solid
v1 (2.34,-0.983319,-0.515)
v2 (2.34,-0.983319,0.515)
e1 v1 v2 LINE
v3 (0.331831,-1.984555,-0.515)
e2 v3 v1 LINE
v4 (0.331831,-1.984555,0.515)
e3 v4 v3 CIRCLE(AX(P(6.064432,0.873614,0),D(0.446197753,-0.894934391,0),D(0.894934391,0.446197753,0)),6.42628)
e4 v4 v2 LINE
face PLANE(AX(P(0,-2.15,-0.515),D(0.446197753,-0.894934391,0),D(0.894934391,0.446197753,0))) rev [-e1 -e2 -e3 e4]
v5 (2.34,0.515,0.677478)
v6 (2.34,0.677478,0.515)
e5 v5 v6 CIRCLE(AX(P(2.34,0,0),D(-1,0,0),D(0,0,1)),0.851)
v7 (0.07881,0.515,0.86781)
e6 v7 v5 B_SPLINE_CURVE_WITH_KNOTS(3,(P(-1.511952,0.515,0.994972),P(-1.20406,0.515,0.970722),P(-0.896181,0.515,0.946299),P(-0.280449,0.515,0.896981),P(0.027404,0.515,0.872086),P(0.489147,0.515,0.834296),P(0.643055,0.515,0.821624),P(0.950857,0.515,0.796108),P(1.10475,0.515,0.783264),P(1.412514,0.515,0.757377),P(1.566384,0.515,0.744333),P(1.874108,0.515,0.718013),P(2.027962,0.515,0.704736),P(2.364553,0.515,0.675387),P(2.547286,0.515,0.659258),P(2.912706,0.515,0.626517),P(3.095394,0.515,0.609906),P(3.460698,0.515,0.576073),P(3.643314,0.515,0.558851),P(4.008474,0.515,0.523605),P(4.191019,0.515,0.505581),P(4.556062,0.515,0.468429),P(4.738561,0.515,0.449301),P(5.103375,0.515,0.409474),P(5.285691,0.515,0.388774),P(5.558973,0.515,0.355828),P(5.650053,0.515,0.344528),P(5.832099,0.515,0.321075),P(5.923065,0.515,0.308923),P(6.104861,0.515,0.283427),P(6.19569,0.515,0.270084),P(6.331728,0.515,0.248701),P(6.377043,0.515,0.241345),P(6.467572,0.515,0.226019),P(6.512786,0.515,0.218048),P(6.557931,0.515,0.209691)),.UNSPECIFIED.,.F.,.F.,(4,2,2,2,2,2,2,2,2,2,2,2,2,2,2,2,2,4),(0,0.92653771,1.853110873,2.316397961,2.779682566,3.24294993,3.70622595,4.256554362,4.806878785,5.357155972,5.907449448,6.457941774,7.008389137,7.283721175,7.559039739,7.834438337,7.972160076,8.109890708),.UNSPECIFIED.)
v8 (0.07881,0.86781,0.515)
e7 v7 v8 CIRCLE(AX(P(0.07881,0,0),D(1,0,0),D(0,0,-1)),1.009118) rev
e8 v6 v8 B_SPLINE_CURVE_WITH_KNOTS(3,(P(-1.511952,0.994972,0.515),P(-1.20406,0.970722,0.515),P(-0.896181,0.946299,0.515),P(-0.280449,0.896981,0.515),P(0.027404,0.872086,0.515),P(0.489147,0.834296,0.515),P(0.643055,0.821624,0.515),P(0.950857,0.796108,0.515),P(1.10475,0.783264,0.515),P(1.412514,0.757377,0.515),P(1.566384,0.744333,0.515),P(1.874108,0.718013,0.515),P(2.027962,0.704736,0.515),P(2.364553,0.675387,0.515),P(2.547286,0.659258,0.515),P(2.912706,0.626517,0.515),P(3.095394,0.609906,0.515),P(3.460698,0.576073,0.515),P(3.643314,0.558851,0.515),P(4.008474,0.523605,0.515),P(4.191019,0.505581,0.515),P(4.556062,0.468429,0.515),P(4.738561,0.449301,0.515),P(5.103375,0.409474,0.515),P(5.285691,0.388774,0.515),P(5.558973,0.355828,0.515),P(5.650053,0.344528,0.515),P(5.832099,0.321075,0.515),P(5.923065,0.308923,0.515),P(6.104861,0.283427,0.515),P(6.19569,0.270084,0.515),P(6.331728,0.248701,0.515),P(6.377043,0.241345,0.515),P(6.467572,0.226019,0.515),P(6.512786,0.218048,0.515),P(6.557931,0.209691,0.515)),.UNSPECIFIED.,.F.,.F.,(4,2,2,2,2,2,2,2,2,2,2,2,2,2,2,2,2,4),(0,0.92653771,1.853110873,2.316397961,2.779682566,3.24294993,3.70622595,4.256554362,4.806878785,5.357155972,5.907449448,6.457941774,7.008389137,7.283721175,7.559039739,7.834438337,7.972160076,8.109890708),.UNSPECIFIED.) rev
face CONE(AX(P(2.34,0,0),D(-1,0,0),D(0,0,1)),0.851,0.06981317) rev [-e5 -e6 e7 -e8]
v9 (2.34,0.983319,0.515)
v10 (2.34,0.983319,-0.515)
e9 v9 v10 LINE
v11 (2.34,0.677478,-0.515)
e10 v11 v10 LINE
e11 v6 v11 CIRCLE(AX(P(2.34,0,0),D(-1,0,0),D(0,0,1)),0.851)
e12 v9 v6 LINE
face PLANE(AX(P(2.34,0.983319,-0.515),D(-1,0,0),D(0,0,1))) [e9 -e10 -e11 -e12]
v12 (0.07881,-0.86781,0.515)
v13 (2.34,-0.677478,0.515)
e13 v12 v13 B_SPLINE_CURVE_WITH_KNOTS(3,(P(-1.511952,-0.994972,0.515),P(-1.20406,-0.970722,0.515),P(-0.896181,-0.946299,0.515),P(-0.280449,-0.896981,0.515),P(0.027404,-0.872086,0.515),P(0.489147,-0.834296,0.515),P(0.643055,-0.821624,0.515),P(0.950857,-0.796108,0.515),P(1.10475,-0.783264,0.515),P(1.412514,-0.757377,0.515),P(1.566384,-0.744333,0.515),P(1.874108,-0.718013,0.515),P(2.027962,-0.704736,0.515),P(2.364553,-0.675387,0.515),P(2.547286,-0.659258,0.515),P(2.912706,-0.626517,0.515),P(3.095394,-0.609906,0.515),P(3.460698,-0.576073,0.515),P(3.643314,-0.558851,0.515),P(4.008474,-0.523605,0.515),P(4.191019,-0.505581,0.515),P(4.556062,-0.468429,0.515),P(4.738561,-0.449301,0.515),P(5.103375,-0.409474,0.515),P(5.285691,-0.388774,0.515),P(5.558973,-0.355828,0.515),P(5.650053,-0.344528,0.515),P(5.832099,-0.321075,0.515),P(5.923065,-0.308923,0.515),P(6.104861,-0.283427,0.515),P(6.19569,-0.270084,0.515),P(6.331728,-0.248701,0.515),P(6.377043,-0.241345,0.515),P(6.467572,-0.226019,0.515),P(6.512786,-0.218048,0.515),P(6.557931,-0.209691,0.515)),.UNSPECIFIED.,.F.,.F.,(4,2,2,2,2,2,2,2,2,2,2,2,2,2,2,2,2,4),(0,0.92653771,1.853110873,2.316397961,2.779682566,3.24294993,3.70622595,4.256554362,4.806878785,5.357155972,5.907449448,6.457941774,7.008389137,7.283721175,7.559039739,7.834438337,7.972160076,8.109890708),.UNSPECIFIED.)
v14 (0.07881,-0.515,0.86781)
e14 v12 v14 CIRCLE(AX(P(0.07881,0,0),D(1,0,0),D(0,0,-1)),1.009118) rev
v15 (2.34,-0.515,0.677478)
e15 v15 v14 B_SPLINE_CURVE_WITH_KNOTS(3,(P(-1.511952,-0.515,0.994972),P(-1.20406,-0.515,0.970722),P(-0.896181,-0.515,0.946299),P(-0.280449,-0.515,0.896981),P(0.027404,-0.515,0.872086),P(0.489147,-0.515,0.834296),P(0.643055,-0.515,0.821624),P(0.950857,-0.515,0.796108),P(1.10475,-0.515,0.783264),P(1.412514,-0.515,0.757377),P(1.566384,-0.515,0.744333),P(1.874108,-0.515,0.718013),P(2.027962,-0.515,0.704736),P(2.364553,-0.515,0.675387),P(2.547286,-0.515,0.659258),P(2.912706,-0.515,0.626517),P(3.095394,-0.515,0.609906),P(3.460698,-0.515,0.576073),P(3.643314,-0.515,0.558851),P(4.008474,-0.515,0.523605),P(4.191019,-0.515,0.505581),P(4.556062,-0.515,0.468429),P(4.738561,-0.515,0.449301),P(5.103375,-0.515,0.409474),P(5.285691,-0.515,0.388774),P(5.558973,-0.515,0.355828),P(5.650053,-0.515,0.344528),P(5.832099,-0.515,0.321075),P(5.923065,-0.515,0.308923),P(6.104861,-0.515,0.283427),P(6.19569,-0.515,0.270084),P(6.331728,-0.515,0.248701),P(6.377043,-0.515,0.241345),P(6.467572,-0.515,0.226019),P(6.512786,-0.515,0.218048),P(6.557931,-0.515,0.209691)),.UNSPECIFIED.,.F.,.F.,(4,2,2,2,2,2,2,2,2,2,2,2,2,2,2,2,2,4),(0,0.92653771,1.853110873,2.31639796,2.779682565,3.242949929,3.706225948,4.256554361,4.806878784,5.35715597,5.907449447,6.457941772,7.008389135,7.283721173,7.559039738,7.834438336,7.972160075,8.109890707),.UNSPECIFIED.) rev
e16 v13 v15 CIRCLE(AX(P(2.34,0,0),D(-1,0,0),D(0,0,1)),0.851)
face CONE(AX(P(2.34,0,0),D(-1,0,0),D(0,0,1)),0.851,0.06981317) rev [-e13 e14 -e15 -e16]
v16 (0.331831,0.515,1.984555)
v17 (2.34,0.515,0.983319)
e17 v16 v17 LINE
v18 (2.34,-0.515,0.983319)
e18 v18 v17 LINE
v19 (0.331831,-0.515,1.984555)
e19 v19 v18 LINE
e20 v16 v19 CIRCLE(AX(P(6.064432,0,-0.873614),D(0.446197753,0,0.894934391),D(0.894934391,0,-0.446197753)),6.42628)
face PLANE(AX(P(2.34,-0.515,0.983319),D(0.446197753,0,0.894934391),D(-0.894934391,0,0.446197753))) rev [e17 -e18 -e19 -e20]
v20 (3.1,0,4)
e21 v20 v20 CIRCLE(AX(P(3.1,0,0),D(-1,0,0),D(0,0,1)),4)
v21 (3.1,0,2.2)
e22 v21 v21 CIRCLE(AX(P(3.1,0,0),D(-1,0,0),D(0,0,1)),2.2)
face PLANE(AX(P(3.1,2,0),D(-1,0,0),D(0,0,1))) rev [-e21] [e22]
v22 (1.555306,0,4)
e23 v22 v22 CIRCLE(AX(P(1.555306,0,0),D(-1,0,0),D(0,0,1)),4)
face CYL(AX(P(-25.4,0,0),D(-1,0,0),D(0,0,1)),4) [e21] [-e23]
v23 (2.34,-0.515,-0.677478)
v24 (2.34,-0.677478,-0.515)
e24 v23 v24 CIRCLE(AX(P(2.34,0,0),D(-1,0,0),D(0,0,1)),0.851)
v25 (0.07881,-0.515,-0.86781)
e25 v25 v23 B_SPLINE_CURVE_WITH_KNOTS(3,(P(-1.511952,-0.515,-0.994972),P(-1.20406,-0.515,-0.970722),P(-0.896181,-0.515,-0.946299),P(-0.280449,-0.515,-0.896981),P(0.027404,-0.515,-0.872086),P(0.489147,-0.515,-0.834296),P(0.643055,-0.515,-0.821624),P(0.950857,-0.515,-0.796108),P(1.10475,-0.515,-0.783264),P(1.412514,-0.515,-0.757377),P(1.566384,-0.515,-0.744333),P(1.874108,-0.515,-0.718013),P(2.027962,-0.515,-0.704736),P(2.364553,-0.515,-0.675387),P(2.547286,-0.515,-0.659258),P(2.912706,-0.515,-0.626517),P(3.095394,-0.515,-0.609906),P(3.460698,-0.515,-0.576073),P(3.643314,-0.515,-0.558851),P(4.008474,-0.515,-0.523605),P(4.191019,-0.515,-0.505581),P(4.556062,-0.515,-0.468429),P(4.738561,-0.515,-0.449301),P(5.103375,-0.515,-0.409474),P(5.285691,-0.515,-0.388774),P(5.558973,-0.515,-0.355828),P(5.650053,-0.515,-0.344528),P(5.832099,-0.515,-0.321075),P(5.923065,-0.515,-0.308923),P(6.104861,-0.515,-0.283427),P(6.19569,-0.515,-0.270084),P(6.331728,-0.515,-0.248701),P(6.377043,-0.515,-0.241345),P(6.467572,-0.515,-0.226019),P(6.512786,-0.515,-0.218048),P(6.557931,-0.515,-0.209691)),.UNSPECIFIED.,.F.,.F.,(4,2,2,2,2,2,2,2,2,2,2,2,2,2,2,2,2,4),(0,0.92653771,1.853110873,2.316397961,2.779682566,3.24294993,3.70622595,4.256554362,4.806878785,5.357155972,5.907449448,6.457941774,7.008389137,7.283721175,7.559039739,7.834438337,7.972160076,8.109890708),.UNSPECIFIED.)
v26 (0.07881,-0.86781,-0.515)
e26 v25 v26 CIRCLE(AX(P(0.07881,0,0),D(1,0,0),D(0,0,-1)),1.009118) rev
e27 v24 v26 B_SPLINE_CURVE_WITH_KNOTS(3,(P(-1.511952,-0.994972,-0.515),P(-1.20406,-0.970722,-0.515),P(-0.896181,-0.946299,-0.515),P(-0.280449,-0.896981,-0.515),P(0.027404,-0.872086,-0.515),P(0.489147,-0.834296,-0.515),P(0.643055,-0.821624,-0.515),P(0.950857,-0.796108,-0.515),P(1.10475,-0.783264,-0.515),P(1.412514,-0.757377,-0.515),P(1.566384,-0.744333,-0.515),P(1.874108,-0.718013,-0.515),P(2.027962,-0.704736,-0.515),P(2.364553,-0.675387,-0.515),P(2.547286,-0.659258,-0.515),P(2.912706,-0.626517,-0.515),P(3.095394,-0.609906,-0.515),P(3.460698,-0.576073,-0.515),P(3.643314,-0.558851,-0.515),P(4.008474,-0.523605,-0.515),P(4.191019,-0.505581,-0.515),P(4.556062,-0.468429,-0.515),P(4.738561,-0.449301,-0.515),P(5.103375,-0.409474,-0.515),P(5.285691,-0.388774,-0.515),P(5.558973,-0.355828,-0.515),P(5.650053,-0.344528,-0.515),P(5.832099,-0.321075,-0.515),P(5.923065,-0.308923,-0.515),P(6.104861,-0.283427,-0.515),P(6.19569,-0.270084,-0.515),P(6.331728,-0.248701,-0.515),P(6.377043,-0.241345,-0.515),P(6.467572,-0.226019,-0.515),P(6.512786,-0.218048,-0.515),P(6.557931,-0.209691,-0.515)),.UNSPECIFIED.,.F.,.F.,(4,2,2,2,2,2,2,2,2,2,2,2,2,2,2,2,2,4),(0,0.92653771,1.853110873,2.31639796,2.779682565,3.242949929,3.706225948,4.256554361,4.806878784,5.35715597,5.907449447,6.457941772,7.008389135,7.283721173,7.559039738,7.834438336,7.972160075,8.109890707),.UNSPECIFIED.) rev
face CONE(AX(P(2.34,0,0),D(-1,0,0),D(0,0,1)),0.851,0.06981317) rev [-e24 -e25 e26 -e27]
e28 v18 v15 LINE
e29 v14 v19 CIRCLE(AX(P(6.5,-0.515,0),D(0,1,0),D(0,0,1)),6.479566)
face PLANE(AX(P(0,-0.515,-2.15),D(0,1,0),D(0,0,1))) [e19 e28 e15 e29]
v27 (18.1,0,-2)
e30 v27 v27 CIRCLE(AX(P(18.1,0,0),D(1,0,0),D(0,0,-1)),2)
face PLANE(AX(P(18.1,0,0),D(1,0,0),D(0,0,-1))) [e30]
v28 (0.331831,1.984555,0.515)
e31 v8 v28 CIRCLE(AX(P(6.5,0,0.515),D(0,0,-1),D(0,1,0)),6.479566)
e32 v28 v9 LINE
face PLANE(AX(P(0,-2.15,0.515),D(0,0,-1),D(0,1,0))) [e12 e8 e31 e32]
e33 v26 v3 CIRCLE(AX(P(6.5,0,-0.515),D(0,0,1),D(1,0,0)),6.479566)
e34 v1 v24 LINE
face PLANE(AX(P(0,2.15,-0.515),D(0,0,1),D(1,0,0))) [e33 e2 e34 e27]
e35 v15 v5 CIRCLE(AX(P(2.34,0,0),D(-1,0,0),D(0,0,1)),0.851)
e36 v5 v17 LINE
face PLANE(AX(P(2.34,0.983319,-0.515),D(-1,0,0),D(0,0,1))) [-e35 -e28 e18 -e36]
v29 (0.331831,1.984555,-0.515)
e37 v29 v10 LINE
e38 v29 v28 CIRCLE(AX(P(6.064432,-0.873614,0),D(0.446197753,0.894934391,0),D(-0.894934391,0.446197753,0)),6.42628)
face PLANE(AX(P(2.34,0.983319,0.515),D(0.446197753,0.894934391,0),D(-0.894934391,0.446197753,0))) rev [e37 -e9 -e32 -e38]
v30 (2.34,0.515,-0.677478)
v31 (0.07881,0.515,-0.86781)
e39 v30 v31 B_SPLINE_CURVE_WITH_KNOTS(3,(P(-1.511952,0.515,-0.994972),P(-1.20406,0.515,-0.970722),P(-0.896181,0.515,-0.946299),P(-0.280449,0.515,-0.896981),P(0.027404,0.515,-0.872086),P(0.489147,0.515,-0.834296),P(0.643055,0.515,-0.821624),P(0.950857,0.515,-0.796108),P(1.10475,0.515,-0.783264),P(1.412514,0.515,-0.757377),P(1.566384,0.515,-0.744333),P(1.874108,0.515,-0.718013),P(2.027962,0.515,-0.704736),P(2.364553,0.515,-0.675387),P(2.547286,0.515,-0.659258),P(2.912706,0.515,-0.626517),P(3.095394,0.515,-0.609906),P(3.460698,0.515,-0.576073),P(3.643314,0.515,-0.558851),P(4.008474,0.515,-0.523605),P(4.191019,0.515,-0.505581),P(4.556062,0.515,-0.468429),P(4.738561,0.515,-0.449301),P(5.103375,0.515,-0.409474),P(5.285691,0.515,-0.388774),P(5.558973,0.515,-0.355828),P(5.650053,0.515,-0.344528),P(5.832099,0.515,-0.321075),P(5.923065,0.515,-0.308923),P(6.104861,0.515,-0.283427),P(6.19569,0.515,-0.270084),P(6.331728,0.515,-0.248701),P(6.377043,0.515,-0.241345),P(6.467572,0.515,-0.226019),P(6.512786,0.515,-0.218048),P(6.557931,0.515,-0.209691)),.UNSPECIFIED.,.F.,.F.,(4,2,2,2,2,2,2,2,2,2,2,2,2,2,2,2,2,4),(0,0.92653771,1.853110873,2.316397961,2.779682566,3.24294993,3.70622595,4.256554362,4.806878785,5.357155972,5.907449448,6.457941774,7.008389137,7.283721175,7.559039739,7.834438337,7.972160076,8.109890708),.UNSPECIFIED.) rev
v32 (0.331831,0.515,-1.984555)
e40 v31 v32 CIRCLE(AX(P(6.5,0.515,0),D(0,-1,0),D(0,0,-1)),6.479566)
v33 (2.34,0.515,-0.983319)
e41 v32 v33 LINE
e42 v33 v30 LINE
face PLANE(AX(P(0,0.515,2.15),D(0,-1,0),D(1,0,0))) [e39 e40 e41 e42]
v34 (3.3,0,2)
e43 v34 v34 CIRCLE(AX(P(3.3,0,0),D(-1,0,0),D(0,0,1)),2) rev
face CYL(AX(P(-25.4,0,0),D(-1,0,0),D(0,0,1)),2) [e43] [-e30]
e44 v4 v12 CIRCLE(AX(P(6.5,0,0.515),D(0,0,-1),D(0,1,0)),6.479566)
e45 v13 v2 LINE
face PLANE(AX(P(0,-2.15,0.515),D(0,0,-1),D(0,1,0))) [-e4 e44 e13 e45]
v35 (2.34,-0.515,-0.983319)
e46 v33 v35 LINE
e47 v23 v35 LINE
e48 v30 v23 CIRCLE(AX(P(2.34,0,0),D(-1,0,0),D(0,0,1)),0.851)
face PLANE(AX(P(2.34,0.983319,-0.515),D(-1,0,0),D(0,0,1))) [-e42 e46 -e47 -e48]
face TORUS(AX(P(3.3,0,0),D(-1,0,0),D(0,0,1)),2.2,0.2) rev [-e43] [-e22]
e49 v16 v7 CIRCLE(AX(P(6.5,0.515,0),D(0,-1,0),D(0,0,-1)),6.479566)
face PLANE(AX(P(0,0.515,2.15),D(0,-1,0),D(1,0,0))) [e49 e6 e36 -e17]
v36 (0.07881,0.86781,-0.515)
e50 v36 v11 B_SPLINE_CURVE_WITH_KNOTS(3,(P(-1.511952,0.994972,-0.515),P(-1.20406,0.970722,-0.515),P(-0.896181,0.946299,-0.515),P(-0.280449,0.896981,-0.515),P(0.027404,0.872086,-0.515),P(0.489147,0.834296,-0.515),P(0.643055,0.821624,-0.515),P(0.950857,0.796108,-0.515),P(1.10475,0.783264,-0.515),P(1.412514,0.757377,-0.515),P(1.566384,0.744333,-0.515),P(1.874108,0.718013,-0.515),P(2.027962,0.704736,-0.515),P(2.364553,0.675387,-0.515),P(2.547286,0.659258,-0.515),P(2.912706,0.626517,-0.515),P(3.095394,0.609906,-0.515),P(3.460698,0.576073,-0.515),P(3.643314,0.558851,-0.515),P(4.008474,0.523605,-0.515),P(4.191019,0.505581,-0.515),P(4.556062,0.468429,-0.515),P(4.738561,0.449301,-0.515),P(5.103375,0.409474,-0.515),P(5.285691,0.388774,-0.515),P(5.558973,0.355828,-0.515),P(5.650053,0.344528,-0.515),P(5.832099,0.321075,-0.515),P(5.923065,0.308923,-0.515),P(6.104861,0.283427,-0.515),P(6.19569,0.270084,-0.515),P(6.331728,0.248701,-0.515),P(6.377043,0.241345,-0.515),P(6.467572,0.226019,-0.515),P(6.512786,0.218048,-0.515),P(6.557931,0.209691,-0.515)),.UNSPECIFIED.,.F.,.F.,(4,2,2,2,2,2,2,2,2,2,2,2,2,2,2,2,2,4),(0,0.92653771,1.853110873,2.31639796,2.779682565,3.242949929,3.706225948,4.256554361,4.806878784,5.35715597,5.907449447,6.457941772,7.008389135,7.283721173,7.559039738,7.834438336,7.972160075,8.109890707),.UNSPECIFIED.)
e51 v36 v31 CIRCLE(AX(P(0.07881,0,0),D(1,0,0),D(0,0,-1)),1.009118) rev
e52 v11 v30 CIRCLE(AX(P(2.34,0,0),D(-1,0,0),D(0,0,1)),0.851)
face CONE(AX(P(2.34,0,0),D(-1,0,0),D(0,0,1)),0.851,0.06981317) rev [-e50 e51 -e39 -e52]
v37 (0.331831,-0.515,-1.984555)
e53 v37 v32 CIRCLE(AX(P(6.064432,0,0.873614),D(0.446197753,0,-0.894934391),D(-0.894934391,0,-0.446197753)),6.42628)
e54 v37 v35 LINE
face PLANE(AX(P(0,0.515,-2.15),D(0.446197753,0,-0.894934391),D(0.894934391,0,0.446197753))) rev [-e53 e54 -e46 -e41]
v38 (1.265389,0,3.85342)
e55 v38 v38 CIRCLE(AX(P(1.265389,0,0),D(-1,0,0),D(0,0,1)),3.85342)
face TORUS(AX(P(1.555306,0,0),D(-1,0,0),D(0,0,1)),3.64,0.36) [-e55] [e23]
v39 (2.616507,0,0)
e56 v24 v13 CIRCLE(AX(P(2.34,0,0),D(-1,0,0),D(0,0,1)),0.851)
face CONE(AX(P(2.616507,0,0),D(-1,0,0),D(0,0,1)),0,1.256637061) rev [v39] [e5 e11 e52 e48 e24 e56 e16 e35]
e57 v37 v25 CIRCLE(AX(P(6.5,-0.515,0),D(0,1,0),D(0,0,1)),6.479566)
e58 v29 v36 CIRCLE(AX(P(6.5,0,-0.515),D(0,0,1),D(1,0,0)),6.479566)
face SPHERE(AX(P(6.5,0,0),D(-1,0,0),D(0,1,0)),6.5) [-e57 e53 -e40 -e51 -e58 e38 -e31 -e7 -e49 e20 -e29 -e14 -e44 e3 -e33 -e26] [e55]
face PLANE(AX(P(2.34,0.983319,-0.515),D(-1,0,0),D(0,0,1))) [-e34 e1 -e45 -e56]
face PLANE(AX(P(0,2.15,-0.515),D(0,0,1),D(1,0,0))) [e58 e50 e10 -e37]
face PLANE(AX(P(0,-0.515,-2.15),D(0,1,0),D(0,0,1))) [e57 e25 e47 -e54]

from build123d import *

# Parameters (mm, degrees)
RECPAT_COUNT       = 2
RECPAT_ANGLE       = 90
BOSS_EXTRU_1_START = 10
ESQUISSE1_R        = 2
BOSS_EXTRU_1_DEPTH = 10


with BuildPart() as part:
    # Fillet1: read off the stored shape, not the designer's step
    # Fillet1 outline → Fillet1 (revolve)
    with BuildSketch(Plane.YX):
        with BuildLine():
            Line((2, 3.3), (2, 8.1))
            Line((2, 8.1), (0, 8.1))
            Line((0, 8.1), (0, 0))
            ThreePointArc((0, 0), (2.027933458, 0.324444488), (3.853420198, 1.265388956))
            ThreePointArc((3.853420198, 1.265388956), (3.961271902, 1.392873227), (4, 1.555305874))
            Line((4, 1.555305874), (4, 3.1))
            Line((4, 3.1), (2.2, 3.1))
            ThreePointArc((2.2, 3.1), (2.058578644, 3.158578644), (2, 3.3))
        make_face()
    revolve(axis=Axis((0, 0, 0), (1, 0, 0)))

    # Sketch3 → Recess section 0
    with BuildSketch(Plane(origin=(0, 0, 0), x_dir=(0, 0, -1), z_dir=(1, 0, 0))):
        with BuildLine():
            Line((0.515, -2.15), (-0.515, -2.15))
            Line((-0.515, -2.15), (-0.515, 2.15))
            Line((-0.515, 2.15), (0.515, 2.15))
            Line((0.515, 2.15), (0.515, -2.15))
        make_face()
    # Sketch4 → Recess section 1
    with BuildSketch(Plane(origin=(2.34, 0, 0), x_dir=(0, 0, -1), z_dir=(1, 0, 0))):
        with BuildLine():
            Line((0.515, -0.983319232), (-0.515, -0.983319232))
            Line((-0.515, -0.983319232), (-0.515, 0.983319232))
            Line((-0.515, 0.983319232), (0.515, 0.983319232))
            Line((0.515, 0.983319232), (0.515, -0.983319232))
        make_face()
    recess = loft(mode=Mode.SUBTRACT)

    # RecPat: Recess ×2 about axis
    recpat_axis = Axis((0, 0, 0), (1, 0, 0))
    for i in range(1, RECPAT_COUNT):
        add(recess.rotate(recpat_axis, i * RECPAT_ANGLE / (RECPAT_COUNT - 1)), mode=Mode.SUBTRACT)

    # RecCorSke → RecessCore (revolve, cut)
    with BuildSketch(Plane.XY, mode=Mode.PRIVATE) as recesscore_sk:
        Polygon((0, 0), (0, 1.01462874), (2.34, 0.851), (2.616506661, 0), align=None)
    revolve(recesscore_sk.sketch.rotate(Axis((-3.175, 0, 0), (1, 0, 0)), 90), axis=Axis((-3.175, 0, 0), (1, 0, 0)), mode=Mode.SUBTRACT)

    # Esquisse1 → Boss.-Extru.1 (add)
    with BuildSketch(Plane(origin=(8.1, 0, 0), x_dir=(0, 0, -1), z_dir=(1, 0, 0)).offset(BOSS_EXTRU_1_START)):
        with Locations(Location((0, 0, 0), (0, 0, 180))):
            Circle(ESQUISSE1_R)
    extrude(amount=-BOSS_EXTRU_1_DEPTH)


solid = part.part
